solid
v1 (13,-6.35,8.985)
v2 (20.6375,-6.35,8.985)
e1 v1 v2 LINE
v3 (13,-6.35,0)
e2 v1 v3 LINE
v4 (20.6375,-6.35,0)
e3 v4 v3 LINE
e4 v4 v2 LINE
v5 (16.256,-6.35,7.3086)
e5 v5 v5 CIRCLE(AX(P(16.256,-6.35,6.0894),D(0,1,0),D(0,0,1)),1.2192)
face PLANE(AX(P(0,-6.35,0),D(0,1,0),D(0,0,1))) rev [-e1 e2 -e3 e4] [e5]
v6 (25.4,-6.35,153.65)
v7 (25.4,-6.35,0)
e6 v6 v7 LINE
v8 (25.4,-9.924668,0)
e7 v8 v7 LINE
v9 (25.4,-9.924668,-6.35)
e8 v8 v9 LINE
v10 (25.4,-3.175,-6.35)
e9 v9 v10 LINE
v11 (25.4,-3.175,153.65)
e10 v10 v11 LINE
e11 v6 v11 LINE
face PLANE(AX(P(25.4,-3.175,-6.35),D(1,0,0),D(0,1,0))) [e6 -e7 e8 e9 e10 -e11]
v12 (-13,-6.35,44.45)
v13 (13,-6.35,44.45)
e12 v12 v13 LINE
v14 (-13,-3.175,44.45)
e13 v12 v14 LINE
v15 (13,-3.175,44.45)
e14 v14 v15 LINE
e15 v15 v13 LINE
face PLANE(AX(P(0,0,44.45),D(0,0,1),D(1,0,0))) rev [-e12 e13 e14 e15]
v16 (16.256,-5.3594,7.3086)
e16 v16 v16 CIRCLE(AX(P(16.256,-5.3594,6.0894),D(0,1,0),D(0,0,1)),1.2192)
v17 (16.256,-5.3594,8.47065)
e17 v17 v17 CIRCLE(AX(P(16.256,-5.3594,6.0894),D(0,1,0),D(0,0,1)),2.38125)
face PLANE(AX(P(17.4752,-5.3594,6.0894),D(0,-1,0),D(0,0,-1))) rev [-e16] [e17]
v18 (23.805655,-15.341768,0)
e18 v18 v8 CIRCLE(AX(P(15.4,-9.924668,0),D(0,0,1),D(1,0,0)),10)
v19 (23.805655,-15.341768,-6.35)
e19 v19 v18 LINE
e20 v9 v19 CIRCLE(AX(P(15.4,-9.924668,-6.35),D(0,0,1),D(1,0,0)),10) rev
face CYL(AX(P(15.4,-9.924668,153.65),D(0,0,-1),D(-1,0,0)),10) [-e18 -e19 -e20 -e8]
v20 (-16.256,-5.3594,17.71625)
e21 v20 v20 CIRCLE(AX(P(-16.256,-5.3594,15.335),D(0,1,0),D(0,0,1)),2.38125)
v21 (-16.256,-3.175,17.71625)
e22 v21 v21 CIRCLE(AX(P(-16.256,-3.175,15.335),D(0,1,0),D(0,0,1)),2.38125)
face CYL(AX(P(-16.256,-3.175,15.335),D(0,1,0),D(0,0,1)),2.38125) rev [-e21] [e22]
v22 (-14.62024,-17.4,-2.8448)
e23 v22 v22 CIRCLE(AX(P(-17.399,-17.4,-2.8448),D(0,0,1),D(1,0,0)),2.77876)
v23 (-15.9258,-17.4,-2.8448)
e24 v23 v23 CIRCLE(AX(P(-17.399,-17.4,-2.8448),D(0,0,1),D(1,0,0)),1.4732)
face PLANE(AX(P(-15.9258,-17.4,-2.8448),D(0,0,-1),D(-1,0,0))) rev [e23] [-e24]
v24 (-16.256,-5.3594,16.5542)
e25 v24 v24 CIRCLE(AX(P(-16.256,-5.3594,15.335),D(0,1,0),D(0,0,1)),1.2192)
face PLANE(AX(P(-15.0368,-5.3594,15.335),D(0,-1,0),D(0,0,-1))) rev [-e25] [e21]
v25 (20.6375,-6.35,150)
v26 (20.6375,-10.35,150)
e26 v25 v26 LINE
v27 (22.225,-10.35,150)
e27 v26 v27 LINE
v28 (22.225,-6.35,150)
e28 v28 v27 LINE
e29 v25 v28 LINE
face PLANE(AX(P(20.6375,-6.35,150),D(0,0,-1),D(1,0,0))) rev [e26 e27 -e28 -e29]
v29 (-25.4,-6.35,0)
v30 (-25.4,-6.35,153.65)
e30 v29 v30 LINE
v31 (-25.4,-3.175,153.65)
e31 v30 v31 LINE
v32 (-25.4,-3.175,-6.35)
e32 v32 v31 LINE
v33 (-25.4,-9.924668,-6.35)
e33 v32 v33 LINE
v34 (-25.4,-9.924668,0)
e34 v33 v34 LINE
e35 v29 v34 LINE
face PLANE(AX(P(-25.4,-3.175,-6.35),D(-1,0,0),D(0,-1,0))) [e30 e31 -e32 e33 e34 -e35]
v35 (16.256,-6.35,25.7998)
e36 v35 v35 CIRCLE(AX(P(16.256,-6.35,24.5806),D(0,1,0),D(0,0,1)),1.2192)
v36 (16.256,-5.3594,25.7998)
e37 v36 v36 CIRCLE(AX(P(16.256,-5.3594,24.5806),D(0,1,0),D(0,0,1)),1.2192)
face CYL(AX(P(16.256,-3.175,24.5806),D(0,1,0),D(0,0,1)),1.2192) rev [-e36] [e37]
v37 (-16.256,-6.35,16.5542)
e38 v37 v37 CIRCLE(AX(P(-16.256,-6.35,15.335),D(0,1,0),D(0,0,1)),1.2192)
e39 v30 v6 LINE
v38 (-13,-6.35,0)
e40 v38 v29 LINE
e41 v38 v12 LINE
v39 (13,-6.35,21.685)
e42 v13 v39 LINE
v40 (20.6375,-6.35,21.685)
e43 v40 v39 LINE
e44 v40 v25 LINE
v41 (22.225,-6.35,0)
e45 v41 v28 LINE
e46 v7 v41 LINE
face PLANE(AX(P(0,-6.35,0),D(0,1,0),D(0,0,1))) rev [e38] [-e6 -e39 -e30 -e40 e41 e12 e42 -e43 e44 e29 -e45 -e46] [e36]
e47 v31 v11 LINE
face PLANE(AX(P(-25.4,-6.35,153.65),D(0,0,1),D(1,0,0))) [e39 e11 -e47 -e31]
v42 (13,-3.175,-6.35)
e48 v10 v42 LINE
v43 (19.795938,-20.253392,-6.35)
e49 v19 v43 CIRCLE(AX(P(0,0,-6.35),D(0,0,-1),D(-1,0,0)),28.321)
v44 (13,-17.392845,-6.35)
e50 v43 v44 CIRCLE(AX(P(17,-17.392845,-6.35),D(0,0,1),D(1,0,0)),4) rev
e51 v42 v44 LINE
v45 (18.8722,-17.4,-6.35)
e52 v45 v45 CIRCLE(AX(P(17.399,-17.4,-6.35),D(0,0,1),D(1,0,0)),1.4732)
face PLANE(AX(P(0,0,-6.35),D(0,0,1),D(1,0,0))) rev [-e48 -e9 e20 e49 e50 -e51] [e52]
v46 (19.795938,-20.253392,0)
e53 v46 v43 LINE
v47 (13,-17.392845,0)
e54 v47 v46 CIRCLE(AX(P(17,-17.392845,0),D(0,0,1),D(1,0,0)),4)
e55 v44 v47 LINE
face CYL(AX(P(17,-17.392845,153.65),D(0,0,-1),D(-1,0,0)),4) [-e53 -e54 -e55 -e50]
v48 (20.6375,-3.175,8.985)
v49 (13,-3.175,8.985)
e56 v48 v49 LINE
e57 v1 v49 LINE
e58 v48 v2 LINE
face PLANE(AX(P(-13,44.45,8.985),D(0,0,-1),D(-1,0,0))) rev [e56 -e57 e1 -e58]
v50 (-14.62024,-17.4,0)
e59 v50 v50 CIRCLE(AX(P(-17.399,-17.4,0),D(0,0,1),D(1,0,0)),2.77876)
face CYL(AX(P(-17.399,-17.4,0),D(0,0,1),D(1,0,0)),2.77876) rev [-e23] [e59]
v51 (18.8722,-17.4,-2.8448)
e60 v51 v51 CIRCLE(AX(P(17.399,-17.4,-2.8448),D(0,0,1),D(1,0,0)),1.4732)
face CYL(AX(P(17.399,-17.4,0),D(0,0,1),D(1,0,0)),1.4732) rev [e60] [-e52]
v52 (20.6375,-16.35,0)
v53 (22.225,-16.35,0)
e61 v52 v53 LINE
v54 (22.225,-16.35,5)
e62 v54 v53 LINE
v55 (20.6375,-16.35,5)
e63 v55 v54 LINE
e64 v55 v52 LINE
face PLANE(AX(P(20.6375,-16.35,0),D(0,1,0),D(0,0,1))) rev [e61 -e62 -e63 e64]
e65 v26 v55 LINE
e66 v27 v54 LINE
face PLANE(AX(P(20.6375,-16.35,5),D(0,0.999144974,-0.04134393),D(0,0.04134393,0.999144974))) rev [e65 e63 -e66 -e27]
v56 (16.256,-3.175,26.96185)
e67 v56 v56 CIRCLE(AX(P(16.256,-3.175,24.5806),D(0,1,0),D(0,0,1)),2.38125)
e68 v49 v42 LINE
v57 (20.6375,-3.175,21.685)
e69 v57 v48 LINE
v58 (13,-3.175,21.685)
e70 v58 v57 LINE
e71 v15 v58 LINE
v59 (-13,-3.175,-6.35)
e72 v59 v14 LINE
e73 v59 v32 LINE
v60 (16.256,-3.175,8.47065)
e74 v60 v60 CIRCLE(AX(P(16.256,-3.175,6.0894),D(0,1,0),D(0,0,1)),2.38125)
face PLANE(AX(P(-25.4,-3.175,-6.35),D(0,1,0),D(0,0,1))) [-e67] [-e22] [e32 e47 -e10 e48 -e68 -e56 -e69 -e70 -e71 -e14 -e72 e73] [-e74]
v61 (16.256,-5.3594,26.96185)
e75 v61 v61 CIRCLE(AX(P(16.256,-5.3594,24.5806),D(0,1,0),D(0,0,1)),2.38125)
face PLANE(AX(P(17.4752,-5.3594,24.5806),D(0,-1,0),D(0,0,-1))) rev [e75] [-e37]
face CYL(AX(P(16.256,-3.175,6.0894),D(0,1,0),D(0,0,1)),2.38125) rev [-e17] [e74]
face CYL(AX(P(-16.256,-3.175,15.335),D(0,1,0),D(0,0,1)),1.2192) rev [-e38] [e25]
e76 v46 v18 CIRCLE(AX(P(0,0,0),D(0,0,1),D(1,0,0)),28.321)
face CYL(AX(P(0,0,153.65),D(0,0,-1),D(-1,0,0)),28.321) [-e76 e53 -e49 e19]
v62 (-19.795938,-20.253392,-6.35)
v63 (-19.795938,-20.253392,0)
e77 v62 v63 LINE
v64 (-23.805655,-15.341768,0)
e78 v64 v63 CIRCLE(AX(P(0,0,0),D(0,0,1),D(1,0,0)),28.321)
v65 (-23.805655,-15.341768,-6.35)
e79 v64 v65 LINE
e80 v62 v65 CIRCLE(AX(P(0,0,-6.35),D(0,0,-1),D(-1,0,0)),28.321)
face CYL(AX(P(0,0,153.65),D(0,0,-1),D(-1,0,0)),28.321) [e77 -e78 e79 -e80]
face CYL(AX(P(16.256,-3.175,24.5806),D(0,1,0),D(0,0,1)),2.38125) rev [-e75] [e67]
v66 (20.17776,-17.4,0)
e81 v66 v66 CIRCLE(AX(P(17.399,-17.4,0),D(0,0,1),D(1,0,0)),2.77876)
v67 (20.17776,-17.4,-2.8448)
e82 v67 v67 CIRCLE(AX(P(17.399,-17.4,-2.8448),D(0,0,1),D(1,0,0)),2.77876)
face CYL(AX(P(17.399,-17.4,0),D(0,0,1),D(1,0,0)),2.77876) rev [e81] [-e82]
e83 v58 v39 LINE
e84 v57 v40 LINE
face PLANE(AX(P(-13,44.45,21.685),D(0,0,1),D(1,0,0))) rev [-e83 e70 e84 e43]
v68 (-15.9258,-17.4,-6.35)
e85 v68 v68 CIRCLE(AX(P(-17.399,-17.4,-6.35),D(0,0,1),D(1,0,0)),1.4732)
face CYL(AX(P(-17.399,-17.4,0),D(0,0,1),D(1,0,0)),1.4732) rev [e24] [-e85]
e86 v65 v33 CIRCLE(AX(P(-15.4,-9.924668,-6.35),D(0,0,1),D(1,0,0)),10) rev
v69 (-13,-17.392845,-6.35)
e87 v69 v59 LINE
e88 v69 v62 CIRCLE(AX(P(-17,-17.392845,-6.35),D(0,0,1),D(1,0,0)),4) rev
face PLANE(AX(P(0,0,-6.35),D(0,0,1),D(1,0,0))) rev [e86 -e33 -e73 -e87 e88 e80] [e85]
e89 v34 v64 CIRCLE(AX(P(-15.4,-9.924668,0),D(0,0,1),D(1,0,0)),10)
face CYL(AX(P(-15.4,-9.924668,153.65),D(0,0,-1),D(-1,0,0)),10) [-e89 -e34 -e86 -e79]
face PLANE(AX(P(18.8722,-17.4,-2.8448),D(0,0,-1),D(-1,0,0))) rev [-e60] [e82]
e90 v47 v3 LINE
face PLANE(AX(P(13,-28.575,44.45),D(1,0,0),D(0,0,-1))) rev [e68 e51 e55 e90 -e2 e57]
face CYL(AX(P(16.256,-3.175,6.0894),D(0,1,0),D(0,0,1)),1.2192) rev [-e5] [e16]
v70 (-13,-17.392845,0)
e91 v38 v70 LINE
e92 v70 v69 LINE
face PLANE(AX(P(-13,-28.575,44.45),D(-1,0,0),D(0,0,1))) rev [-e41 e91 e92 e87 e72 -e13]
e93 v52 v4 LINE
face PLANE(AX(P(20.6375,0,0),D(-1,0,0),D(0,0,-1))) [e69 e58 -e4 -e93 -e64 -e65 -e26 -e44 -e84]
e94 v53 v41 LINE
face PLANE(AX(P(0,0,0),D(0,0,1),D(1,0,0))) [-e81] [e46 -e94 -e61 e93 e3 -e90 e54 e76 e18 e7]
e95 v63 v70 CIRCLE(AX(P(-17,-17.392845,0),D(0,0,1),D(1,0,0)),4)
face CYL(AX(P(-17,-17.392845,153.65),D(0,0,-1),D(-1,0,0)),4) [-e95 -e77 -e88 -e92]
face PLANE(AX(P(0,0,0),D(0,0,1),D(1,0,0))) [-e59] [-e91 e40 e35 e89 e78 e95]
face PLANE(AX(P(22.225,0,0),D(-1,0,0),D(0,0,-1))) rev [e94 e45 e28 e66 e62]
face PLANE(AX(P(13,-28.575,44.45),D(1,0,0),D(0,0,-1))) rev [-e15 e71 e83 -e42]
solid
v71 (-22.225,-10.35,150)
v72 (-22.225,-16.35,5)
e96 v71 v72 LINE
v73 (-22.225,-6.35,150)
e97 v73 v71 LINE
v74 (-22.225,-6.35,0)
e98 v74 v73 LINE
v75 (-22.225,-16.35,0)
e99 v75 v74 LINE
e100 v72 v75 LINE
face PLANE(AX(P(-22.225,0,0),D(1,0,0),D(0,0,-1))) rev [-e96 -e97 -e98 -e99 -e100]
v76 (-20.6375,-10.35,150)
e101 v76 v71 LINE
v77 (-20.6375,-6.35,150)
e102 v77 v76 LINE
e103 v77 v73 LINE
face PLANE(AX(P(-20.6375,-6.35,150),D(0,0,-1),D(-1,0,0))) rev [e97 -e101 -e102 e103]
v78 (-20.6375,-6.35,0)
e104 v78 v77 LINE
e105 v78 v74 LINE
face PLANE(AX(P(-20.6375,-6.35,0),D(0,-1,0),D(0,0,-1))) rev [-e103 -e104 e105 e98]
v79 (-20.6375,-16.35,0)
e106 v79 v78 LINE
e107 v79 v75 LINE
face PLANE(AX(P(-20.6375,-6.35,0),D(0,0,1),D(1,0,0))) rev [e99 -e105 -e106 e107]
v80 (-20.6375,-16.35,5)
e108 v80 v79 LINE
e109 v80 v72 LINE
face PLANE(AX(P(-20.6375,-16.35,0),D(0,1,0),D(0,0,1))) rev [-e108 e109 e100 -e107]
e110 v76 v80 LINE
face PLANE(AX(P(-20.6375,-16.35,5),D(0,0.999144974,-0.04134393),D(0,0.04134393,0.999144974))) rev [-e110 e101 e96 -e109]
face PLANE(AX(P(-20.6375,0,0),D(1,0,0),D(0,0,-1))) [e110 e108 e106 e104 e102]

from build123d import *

# Parameters (mm, degrees)
SKETCH1_W                                     = 50.8
SKETCH1_H                                     = 25.4
BASE_FLANGE1_DEPTH                            = 6.35
SKETCH22_W                                    = 50.8
SKETCH22_H                                    = 160
BOSS_EXTRUDE1_DEPTH                           = 3.175
GUSSET1_START                                 = -22.225
GUSSET1_DEPTH                                 = 1.5875
CBORE_FOR_4_SOCKET_HEAD_CAP_SCREW1_AT_2_COUNT = 2
CBORE_FOR_4_SOCKET_HEAD_CAP_SCREW1_AT_2_PITCH = 34.798
SKETCH12_W                                    = 26
SKETCH12_H                                    = 28.575
CUT_EXTRUDE1_DEPTH                            = 50.8
SKETCH13_W                                    = 33.6375
SKETCH13_H                                    = 12.7
CUT_EXTRUDE2_DEPTH                            = 50.8
CBORE_FOR_2_SOCKET_HEAD_CAP_SCREW1_AT_2_COUNT = 2
CBORE_FOR_2_SOCKET_HEAD_CAP_SCREW1_AT_2_PITCH = 33.801054175
CBORE_FOR_2_SOCKET_HEAD_CAP_SCREW1_AT_3_COUNT = 2
CBORE_FOR_2_SOCKET_HEAD_CAP_SCREW1_AT_3_PITCH = 33.801054175
SKETCH17_OUTSIDE_W                            = 86.756
SKETCH17_OUTSIDE_H                            = 61.356
SKETCH17_OUTSIDE_R                            = 28.321
CUT_EXTRUDE3_DEPTH                            = 165.504378741
FILLET1_R                                     = 10
FILLET2_R                                     = 4


# Read off the part's stored shape, not the designer's step: Gusset1
# Sheet-metal steps are written as plain solids
with BuildPart() as part:
    # Sketch1 → Base-Flange1 (new body)
    with BuildSketch(Plane.XY):
        with Locations((0, -15.875)):
            Rectangle(SKETCH1_W, SKETCH1_H)
    extrude(amount=-BASE_FLANGE1_DEPTH)

    # Sketch22 → Boss-Extrude1 (add)
    with BuildSketch(Plane(origin=(0, -3.175, 0), x_dir=(1, 0, 0), z_dir=(0, 1, 0))):
        with Locations((0, -73.65)):
            Rectangle(SKETCH22_W, SKETCH22_H)
    extrude(amount=-BOSS_EXTRUDE1_DEPTH)

    # Sketch11 → CBORE for #4 Socket Head Cap Screw1 (revolve, cut)
    with BuildSketch(Plane(origin=(-17.399, -17.4, 0), x_dir=(0, -1, 0), z_dir=(1, 0, 0))):
        Polygon((0, 0), (0, 6.351), (1.4732, 6.351), (1.4732, 2.8448), (2.77876, 2.8448), (2.77876, 0), align=None)
    cbore_for_4_socket_head_cap_screw1 = revolve(axis=Axis((-17.399, -17.4, 6.35), (0, 0, -1)), mode=Mode.SUBTRACT)

    # CBORE for #4 Socket Head Cap Screw1 at 2: CBORE for #4 Socket Head Cap Screw1 ×2
    with Locations(*[(i * CBORE_FOR_4_SOCKET_HEAD_CAP_SCREW1_AT_2_PITCH, 0, 0) for i in range(1, CBORE_FOR_4_SOCKET_HEAD_CAP_SCREW1_AT_2_COUNT)]):
        add(cbore_for_4_socket_head_cap_screw1, mode=Mode.SUBTRACT)

    # Sketch12 → Cut-Extrude1 (cut)
    with BuildSketch(Plane(origin=(0, 0, -6.35), x_dir=(-1, 0, 0), z_dir=(0, 0, -1))):
        with Locations((0, -14.2875)):
            Rectangle(SKETCH12_W, SKETCH12_H)
    extrude(amount=-CUT_EXTRUDE1_DEPTH, mode=Mode.SUBTRACT)


with BuildPart() as body_2:
    # Gusset1 outline → Gusset1 (new body)
    with BuildSketch(Plane.YZ.offset(GUSSET1_START)):
        Polygon((-16.35, 5), (-16.35, 0), (-6.35, 0), (-6.35, 150), (-10.35, 150), align=None)
    gusset1 = extrude(amount=GUSSET1_DEPTH)


with BuildPart() as part_1:
    add(part.part)

    # Mirror2: Gusset1 across plane
    add(gusset1.mirror(Plane(origin=(0, 0, 0), x_dir=(0, 0, 1), z_dir=(1, 0, 0))))

    # Sketch13 → Cut-Extrude2 (cut)
    with BuildSketch(Plane.XZ.offset(6.35)):
        with Locations((3.81875, 15.335)):
            Rectangle(SKETCH13_W, SKETCH13_H)
    extrude(amount=-CUT_EXTRUDE2_DEPTH, mode=Mode.SUBTRACT)

    # Sketch16 → CBORE for #2 Socket Head Cap Screw1 (revolve, cut)
    with BuildSketch(Plane(origin=(-16.256, -3.175, 15.335), x_dir=(0, 0, 1), z_dir=(1, 0, 0))):
        Polygon((0, 0), (0, 17.242569267), (1.2192, 16.51), (1.2192, 2.1844), (2.38125, 2.1844), (2.38125, 0), align=None)
    cbore_for_2_socket_head_cap_screw1 = revolve(axis=Axis((-16.256, 3.175, 15.335), (0, -1, 0)), mode=Mode.SUBTRACT)

    # CBORE for #2 Socket Head Cap Screw1 at 2: CBORE for #2 Socket Head Cap Screw1 ×2
    with Locations(*[Vector(0.9618634919315714, 0, 0.27352993051804053) * (i * CBORE_FOR_2_SOCKET_HEAD_CAP_SCREW1_AT_2_PITCH) for i in range(1, CBORE_FOR_2_SOCKET_HEAD_CAP_SCREW1_AT_2_COUNT)]):
        add(cbore_for_2_socket_head_cap_screw1, mode=Mode.SUBTRACT)

    # CBORE for #2 Socket Head Cap Screw1 at 3: CBORE for #2 Socket Head Cap Screw1 ×2
    with Locations(*[Vector(0.9618634919315714, 0, -0.2735299305180405) * (i * CBORE_FOR_2_SOCKET_HEAD_CAP_SCREW1_AT_3_PITCH) for i in range(1, CBORE_FOR_2_SOCKET_HEAD_CAP_SCREW1_AT_3_COUNT)]):
        add(cbore_for_2_socket_head_cap_screw1, mode=Mode.SUBTRACT)

    # Sketch17 outside → Cut-Extrude3 (cut, through all)
    with BuildSketch(Plane(origin=(0, 0, -6.35), x_dir=(-1, 0, 0), z_dir=(0, 0, -1))):
        with Locations((0, -15.875)):
            Rectangle(SKETCH17_OUTSIDE_W, SKETCH17_OUTSIDE_H)
        Circle(SKETCH17_OUTSIDE_R, mode=Mode.SUBTRACT)
    extrude(amount=-CUT_EXTRUDE3_DEPTH, mode=Mode.SUBTRACT)

    # Fillet1
    fillet1_edges = [part_1.edges().sort_by_distance(p)[0] for p in [
        (25.4, -12.526733054, -3.175),
        (-25.4, -12.526733054, -3.175),
    ]]
    fillet(fillet1_edges, radius=FILLET1_R)

    # Fillet2
    fillet2_edges = [part_1.edges().sort_by_distance(p)[0] for p in [
        (-13, -25.161062001, -3.175),
        (13, -25.161062001, -3.175),
    ]]
    fillet(fillet2_edges, radius=FILLET2_R)


solid = Compound([body_2.part, part_1.part])
